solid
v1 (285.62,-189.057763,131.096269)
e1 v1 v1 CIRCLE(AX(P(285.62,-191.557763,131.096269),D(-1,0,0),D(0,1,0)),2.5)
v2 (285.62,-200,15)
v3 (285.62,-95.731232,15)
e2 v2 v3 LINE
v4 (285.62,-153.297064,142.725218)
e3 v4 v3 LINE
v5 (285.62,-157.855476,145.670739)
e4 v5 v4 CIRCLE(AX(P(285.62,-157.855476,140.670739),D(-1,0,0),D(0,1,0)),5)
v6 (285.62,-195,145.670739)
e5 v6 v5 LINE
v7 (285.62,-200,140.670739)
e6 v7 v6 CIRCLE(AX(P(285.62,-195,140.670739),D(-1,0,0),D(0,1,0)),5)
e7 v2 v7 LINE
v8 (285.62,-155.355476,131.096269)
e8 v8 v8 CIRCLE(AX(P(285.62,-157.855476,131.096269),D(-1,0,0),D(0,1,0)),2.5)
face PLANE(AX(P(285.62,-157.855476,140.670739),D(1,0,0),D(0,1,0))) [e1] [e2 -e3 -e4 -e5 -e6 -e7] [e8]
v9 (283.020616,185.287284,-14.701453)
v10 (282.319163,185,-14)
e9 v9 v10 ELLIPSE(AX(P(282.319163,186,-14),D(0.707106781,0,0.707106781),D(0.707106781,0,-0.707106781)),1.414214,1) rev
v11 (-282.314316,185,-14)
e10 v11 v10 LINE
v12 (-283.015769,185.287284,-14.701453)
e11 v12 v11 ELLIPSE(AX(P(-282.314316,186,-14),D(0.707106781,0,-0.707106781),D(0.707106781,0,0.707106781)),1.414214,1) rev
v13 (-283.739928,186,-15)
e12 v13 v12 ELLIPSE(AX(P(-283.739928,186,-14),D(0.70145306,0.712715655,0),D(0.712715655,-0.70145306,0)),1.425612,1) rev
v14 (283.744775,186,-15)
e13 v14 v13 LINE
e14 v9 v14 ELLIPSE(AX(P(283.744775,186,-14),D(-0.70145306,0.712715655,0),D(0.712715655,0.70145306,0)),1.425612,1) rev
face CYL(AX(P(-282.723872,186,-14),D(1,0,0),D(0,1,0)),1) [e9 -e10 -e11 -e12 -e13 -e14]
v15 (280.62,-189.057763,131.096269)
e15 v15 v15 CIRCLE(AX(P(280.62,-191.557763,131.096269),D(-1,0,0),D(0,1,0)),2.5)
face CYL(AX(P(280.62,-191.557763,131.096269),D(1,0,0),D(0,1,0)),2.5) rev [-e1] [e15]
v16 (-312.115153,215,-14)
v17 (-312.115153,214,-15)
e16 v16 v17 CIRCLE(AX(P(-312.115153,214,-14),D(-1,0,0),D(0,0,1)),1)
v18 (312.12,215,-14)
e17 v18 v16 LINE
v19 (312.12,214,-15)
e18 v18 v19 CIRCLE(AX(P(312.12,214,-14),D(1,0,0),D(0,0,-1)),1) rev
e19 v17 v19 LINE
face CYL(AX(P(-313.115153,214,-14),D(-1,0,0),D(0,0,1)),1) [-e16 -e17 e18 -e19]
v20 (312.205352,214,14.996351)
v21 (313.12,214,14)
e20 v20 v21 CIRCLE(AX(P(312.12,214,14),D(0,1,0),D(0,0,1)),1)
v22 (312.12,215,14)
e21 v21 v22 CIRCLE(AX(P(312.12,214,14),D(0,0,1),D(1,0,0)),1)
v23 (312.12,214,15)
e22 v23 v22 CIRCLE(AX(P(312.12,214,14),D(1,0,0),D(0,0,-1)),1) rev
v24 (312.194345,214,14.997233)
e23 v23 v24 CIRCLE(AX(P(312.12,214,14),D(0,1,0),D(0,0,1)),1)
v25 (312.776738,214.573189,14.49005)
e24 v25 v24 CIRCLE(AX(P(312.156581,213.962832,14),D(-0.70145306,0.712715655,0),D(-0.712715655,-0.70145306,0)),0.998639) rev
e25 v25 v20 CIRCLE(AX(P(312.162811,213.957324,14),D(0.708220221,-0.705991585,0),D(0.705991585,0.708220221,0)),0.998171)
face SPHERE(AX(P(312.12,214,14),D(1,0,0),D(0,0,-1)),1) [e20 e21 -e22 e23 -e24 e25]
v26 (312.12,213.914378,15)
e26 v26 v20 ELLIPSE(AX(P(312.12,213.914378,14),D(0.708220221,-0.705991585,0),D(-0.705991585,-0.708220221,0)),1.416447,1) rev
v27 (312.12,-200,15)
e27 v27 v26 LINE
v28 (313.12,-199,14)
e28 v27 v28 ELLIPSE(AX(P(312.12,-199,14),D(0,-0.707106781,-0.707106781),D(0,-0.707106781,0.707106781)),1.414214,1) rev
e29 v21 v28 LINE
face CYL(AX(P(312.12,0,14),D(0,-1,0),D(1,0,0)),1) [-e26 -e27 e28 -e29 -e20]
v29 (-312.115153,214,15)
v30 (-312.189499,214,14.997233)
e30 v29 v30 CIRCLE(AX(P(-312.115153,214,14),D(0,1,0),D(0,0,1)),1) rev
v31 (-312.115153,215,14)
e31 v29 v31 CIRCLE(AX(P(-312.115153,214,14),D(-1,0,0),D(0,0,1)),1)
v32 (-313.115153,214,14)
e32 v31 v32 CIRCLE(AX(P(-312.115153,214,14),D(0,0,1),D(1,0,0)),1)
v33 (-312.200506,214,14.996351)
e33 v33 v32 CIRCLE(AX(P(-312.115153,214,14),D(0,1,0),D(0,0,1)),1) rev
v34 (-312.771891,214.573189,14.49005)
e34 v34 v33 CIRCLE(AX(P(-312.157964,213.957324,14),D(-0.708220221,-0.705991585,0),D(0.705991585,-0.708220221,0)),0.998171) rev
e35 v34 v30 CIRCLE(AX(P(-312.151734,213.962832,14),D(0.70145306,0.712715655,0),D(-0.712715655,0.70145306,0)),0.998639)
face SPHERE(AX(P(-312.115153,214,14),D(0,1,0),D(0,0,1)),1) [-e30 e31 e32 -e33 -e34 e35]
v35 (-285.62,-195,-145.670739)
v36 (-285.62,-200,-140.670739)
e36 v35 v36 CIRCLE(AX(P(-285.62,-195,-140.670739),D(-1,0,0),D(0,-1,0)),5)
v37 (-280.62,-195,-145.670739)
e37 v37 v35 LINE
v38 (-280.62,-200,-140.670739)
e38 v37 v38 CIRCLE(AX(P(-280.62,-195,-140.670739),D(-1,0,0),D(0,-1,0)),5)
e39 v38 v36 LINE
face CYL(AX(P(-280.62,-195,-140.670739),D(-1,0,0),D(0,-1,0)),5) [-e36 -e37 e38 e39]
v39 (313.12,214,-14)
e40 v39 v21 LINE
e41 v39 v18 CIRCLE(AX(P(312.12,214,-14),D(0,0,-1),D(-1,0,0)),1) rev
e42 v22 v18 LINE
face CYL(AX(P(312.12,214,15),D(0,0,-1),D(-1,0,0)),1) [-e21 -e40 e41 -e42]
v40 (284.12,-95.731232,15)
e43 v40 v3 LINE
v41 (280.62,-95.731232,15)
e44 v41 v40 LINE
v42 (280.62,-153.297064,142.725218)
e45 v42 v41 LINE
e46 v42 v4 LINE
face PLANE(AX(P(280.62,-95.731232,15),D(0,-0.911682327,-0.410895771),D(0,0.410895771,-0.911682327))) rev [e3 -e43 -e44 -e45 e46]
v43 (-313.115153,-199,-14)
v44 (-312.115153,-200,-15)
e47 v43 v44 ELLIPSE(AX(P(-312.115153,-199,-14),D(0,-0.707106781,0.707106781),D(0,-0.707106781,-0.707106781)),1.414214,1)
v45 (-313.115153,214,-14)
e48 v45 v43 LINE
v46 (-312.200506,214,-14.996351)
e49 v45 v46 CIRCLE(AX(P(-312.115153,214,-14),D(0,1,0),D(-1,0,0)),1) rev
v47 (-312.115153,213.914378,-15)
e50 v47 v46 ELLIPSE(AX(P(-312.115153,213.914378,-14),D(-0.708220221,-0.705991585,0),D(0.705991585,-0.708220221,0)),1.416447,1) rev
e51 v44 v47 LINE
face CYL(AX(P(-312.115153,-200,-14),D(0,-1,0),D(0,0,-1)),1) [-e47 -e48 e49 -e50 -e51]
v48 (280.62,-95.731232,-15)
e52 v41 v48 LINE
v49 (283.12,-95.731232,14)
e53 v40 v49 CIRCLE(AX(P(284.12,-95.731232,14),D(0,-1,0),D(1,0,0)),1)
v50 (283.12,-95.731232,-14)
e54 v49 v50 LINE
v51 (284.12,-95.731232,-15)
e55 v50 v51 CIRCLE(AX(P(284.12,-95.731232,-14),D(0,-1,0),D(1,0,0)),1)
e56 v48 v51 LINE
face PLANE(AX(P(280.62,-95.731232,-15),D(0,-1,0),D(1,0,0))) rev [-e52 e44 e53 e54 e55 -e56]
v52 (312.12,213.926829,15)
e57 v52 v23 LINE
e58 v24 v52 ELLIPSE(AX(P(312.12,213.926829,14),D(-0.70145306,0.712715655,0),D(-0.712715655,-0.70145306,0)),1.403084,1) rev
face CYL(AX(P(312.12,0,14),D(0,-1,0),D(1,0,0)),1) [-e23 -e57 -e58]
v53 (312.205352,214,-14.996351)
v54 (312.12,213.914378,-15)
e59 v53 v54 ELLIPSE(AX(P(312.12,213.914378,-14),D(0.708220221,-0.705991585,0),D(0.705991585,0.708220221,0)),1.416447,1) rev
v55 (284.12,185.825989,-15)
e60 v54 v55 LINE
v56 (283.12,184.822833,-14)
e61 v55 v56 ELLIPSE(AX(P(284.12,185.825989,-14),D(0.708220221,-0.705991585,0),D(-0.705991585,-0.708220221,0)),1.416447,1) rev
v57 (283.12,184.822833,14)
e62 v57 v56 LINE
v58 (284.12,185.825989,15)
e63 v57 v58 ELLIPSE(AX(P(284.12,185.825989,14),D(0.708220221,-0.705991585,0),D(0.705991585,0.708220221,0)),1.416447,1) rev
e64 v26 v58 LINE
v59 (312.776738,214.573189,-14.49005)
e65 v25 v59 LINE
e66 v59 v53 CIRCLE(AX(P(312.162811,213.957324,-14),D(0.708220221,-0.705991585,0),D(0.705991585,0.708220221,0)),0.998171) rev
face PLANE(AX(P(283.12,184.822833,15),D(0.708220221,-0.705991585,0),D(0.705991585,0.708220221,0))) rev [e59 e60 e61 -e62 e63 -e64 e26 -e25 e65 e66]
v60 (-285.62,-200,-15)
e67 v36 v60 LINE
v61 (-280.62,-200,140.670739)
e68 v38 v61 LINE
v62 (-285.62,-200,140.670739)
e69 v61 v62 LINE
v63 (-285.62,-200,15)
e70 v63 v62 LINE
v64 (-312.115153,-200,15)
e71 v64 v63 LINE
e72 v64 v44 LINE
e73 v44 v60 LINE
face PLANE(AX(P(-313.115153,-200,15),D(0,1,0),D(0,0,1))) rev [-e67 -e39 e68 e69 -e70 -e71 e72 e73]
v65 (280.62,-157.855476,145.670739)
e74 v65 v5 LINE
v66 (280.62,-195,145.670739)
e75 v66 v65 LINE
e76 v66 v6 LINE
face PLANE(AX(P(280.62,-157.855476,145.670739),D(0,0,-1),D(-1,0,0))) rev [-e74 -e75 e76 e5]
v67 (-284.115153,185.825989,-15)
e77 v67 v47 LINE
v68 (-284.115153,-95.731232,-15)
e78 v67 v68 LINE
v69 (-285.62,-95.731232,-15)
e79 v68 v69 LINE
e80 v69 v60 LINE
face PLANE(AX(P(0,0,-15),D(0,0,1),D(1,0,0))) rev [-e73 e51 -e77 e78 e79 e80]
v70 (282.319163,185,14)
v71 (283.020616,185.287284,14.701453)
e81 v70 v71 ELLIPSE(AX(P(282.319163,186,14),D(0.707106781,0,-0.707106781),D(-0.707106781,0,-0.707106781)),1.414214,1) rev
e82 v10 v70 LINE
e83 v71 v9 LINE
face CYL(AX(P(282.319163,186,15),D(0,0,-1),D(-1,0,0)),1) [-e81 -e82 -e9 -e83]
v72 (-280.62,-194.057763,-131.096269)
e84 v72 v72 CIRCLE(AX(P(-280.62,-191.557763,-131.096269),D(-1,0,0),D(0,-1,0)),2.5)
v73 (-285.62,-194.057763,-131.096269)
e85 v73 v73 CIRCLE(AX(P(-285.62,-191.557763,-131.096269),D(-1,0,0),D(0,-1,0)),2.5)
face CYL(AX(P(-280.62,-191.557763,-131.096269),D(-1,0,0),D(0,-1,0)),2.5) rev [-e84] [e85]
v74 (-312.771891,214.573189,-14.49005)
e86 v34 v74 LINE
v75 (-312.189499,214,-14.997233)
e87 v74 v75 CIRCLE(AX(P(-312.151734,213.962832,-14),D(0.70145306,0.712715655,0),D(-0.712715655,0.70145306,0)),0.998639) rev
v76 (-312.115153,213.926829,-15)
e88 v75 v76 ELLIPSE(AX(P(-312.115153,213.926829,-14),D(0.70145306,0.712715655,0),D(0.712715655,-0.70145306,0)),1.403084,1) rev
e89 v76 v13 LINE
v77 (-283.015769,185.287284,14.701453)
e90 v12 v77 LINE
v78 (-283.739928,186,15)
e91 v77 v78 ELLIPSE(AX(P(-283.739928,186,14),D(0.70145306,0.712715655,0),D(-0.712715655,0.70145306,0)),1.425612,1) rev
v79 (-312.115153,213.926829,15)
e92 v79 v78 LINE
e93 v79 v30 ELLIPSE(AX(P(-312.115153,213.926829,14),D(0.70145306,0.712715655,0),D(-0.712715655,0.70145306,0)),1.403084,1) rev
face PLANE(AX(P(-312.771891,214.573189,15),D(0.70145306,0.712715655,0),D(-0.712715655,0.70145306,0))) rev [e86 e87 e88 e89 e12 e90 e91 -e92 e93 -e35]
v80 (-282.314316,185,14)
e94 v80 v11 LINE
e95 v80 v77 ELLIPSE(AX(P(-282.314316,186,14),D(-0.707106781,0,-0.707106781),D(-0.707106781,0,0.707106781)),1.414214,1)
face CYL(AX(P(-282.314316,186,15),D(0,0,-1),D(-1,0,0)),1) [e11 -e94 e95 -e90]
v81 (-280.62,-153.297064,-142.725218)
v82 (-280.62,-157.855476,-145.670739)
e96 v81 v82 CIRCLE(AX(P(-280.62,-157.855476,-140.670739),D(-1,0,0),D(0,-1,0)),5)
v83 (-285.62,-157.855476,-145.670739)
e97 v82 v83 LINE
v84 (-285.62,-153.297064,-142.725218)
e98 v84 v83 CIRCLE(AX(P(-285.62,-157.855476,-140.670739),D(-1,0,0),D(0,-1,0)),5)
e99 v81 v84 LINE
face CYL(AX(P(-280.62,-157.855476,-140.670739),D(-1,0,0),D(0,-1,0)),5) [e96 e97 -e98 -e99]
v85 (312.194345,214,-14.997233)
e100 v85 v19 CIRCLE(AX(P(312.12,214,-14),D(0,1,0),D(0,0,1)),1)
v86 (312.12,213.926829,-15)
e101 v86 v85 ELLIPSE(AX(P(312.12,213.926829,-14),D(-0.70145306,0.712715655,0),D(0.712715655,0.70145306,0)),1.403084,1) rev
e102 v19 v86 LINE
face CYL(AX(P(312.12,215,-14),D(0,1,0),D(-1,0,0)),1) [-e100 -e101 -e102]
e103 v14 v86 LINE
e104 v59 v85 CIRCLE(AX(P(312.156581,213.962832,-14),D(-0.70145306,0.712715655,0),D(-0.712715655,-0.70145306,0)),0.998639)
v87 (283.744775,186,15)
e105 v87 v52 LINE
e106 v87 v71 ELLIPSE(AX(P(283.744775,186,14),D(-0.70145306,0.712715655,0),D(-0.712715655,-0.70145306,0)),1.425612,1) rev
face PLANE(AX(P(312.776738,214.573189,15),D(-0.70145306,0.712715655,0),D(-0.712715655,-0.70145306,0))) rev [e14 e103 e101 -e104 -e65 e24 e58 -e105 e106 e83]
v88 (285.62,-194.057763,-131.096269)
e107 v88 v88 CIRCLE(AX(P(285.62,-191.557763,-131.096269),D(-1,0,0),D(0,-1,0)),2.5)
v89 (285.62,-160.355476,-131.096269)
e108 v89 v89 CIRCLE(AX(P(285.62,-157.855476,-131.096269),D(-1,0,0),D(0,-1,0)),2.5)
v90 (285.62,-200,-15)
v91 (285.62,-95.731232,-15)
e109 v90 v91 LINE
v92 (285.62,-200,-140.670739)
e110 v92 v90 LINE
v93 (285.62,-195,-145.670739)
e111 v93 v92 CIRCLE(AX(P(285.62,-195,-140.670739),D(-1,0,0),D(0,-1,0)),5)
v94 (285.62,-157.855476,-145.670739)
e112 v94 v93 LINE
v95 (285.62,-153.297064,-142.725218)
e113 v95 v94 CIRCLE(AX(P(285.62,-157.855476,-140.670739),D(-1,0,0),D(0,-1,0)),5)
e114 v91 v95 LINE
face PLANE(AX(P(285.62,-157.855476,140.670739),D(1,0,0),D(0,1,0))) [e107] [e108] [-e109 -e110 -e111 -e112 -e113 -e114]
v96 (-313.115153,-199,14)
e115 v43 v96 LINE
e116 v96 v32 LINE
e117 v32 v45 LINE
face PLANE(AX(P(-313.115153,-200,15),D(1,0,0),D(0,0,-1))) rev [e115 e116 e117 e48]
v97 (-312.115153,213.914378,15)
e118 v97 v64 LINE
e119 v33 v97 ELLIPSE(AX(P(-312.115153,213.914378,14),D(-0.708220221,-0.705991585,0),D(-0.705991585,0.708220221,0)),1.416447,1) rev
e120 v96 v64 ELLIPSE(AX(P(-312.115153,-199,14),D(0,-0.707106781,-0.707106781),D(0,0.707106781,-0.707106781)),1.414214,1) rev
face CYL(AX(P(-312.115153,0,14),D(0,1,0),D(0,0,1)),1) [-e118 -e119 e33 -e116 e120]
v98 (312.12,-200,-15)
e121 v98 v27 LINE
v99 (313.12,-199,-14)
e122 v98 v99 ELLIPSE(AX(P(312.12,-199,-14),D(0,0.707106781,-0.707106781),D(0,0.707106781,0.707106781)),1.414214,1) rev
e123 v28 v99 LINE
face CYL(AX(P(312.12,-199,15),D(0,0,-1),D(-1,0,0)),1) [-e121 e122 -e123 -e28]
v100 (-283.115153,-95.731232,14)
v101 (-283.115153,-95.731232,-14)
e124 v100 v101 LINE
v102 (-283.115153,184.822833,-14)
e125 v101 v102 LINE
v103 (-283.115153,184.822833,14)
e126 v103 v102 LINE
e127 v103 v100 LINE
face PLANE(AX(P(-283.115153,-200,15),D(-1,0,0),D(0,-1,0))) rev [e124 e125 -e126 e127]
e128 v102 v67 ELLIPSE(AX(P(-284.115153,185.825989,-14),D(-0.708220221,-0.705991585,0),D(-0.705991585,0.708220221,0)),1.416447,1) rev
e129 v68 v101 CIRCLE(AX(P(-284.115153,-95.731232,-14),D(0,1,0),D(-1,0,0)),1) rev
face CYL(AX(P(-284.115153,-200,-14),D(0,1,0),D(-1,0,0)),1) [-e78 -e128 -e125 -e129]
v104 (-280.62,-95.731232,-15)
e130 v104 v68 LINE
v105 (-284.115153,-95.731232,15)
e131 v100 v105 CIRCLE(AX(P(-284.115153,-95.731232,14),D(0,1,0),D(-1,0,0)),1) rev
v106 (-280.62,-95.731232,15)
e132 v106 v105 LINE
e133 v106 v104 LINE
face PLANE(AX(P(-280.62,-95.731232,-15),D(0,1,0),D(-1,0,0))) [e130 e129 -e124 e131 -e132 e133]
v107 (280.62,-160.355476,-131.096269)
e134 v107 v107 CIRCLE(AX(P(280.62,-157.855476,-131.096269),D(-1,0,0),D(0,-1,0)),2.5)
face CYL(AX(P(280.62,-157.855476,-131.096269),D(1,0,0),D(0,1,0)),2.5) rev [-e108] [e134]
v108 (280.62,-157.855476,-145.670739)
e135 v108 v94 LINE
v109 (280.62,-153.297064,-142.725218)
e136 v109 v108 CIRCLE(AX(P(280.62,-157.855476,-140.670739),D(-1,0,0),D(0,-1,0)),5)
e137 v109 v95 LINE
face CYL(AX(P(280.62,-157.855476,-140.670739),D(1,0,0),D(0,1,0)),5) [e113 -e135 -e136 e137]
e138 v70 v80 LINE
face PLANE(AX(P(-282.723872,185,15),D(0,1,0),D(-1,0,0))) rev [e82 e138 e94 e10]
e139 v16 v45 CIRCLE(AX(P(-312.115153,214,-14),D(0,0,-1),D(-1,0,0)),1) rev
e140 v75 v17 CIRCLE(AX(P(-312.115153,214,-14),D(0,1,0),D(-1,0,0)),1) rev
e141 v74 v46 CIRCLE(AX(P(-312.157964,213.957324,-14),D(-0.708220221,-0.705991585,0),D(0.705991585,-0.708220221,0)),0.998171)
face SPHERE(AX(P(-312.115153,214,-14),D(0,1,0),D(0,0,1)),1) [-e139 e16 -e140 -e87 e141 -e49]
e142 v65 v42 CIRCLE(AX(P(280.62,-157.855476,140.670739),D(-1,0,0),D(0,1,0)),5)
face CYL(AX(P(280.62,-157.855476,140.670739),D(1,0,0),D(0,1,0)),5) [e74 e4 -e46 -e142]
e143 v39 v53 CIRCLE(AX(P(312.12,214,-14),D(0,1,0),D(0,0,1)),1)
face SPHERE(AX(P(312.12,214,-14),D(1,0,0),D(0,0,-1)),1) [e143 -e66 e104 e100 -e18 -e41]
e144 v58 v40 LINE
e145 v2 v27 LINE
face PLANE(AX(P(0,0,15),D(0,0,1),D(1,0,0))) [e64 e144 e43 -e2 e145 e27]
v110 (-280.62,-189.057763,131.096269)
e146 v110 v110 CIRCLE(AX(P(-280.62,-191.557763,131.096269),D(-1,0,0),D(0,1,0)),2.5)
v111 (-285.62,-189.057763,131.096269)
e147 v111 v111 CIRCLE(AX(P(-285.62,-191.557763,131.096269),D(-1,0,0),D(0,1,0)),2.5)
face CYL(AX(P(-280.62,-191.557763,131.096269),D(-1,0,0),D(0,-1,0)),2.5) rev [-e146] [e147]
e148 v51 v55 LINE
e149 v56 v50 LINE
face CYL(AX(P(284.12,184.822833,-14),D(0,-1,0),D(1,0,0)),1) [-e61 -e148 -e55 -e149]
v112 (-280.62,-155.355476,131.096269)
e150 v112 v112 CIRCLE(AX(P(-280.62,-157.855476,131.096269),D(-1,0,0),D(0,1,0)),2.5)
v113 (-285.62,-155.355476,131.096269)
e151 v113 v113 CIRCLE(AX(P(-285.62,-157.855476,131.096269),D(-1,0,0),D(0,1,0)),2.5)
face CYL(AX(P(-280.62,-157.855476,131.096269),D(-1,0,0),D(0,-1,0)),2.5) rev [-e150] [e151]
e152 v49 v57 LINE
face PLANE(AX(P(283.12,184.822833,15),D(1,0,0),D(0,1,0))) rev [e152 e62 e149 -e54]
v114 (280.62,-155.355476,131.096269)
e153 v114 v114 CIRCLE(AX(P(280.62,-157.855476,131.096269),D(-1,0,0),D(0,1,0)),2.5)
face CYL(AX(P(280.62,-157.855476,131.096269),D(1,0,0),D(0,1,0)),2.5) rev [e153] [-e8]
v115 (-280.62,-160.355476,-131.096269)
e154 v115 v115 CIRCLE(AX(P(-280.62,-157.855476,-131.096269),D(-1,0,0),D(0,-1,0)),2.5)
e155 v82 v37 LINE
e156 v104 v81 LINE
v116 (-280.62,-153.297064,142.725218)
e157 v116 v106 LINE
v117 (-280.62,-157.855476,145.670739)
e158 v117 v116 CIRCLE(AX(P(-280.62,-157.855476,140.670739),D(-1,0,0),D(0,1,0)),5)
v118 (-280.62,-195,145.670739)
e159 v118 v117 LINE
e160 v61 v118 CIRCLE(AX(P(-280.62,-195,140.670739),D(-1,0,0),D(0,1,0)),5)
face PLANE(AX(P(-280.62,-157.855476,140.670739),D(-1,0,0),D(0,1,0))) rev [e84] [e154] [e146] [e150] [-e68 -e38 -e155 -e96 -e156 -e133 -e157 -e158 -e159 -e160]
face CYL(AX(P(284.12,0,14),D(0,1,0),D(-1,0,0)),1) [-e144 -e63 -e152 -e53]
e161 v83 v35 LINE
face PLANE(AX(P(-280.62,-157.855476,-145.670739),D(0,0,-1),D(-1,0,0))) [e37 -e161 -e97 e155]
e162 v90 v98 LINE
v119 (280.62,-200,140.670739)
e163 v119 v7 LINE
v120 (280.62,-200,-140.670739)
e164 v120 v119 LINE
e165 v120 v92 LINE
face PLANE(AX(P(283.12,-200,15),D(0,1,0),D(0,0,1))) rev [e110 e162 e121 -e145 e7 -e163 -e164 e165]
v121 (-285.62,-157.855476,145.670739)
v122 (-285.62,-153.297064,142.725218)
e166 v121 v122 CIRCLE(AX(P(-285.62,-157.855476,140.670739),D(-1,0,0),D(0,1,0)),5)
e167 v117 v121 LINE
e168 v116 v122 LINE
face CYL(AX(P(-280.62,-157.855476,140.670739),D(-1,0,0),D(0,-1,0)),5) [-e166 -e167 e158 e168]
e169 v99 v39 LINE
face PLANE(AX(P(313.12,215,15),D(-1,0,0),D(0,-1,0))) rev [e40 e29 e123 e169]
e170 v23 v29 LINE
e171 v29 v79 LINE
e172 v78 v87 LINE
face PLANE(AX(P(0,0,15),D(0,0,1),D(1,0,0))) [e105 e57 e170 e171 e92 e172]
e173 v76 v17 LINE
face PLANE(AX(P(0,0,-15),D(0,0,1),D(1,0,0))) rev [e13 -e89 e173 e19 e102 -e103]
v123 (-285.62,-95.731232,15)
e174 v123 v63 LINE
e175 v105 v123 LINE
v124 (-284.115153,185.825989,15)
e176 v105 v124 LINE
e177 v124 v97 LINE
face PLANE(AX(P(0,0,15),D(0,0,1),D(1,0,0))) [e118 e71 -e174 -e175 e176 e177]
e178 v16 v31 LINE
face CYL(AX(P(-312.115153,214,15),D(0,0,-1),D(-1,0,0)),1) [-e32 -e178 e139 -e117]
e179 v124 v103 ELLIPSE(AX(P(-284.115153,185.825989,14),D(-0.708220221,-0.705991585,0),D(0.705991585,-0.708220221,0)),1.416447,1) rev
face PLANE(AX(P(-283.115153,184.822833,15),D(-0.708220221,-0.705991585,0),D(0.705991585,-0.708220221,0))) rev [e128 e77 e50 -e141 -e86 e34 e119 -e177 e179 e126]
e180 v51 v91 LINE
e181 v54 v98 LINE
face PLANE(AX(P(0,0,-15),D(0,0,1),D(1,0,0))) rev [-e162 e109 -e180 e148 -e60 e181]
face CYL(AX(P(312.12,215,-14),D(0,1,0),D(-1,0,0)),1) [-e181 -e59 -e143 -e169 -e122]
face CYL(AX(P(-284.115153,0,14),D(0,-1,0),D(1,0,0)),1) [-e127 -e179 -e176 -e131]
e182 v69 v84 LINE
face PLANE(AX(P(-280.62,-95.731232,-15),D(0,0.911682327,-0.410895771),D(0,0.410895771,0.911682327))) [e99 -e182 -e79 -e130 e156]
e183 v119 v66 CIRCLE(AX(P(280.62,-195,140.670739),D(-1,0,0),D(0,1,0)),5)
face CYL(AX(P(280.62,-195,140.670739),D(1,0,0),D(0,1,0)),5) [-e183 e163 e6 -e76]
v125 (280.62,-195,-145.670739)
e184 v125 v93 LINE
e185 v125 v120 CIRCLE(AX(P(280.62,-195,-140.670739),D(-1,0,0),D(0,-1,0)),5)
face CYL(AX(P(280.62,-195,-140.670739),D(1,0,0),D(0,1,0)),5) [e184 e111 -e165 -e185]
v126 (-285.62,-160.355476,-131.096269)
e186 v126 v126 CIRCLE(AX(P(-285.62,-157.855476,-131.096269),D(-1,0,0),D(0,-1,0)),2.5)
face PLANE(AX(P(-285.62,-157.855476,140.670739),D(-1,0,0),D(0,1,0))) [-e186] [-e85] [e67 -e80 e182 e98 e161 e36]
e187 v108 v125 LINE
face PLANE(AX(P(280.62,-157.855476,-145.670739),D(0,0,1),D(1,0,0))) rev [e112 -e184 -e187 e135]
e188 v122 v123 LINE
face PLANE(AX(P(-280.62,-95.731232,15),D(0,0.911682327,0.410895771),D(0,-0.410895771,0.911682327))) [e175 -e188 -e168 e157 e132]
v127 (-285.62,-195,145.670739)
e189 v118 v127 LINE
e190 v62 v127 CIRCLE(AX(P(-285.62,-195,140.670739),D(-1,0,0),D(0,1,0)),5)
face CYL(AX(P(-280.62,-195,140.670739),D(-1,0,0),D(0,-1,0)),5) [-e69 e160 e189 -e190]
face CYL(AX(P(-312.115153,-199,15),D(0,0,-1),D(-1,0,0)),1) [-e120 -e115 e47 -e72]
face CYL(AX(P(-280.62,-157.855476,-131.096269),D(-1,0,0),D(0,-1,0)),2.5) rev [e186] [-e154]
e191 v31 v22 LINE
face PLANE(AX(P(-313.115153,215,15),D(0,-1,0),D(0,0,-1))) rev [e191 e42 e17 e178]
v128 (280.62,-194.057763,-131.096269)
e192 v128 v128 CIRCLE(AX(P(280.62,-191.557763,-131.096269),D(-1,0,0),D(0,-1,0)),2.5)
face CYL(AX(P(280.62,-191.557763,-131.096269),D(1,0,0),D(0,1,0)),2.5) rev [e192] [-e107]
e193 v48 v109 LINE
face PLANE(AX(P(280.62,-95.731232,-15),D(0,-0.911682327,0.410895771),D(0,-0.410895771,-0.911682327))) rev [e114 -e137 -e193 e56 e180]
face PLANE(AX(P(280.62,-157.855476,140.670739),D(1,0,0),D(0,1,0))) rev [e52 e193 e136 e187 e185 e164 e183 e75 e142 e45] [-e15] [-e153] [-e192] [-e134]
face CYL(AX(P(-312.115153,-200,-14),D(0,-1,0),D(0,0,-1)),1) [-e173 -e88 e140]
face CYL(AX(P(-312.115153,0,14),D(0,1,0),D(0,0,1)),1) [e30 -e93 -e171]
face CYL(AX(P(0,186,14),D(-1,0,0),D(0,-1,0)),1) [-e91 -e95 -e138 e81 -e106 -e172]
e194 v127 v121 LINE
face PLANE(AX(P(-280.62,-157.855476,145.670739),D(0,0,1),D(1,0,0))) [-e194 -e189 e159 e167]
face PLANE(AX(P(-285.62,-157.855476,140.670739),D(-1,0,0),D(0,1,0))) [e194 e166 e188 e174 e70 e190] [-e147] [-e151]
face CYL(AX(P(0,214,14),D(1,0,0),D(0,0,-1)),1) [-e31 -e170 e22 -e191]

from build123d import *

# Parameters (mm, degrees)
BOSS_EXTRUDE1_DEPTH = 15
SKETCH2_R           = 2.5
BOSS_EXTRUDE2_DEPTH = 2.5
FILLET1_R           = 1


with BuildPart() as part:
    # Sketch1 → Boss-Extrude1 (new, symmetric)
    with BuildSketch(Plane.XY):
        Polygon((-283.115153194, -200), (-283.115153194, 184.822832525), (-312.771891152, 214.573189293), (-282.723872007, 185), (282.728718813, 185), (312.776737958, 214.573189293), (283.12, 184.822832525), (283.12, -200), (313.12, -200), (313.12, 215), (-313.115153194, 215), (-313.115153194, -200), align=None)
    extrude(amount=BOSS_EXTRUDE1_DEPTH, both=True)

    # Sketch2 → Boss-Extrude2 (add, symmetric)
    with BuildSketch(Plane.ZY.offset(-283.12)):
        with BuildLine():
            Line((-15, -95.731232334), (-142.725217813, -153.297064452))
            ThreePointArc((-142.725217813, -153.297064452), (-144.870286213, -155.141843308), (-145.67073896, -157.855476088))
            Line((-145.67073896, -157.855476088), (-145.67073896, -195))
            ThreePointArc((-145.67073896, -195), (-144.206272866, -198.535533906), (-140.67073896, -200))
            Line((-140.67073896, -200), (140.67073896, -200))
            ThreePointArc((140.67073896, -200), (144.206272866, -198.535533906), (145.67073896, -195))
            Line((145.67073896, -195), (145.67073896, -157.855476088))
            ThreePointArc((145.67073896, -157.855476088), (144.870286213, -155.141843308), (142.725217813, -153.297064452))
            Line((142.725217813, -153.297064452), (15, -95.731232334))
            Line((15, -95.731232334), (-15, -95.731232334))
        make_face()
        with Locations(Location((-131.096268678, -157.855476088, 0), (0, 0, 270))):
            Circle(SKETCH2_R, mode=Mode.SUBTRACT)
        with Locations(Location((-131.096268678, -191.557763375, 0), (0, 0, 270))):
            Circle(SKETCH2_R, mode=Mode.SUBTRACT)
        with Locations(Location((131.096268678, -191.557763375, 0), (0, 0, 90))):
            Circle(SKETCH2_R, mode=Mode.SUBTRACT)
        with Locations(Location((131.096268678, -157.855476088, 0), (0, 0, 90))):
            Circle(SKETCH2_R, mode=Mode.SUBTRACT)
    boss_extrude2 = extrude(amount=BOSS_EXTRUDE2_DEPTH, both=True)

    # Mirror2: Boss-Extrude2 across plane
    add(boss_extrude2.mirror(Plane(origin=(0, 0, 0), x_dir=(0, 0, 1), z_dir=(1, 0, 0))))

    # Fillet1
    # the kernel refuses this fillet: 1 mm, written as the material it takes off along each edge
    with BuildSketch(Plane(origin=(-312.115153194, 214, -14), x_dir=(0, 0, -1), z_dir=(-1, 0, 0))) as fillet1_piece_1_section:
        Polygon((0, 0), (FILLET1_R * 1.02, 0), (FILLET1_R * 1.02, -FILLET1_R * 1.02), (0, -FILLET1_R * 1.02), align=None)
    fillet1_piece_1 = extrude(amount=FILLET1_R * 1.02, mode=Mode.PRIVATE)
    fillet1_piece_1 = fillet1_piece_1 - Plane(origin=(-312.115153194, 214, -14), x_dir=(0, -0.7071067811865475, 0.7071067811865475), z_dir=(-1, 0, 0)) * Sphere(FILLET1_R, mode=Mode.PRIVATE)
    add(fillet1_piece_1, mode=Mode.SUBTRACT)
    with BuildSketch(Plane(origin=(312.12, 214, -14), x_dir=(1, 0, 0), z_dir=(0, 1, 0))) as fillet1_piece_2_section:
        Polygon((0, 0), (FILLET1_R * 1.02, 0), (FILLET1_R * 1.02, FILLET1_R * 1.02), (0, FILLET1_R * 1.02), align=None)
    fillet1_piece_2 = extrude(amount=FILLET1_R * 1.02, mode=Mode.PRIVATE)
    fillet1_piece_2 = fillet1_piece_2 - Plane(origin=(312.12, 214, -14), x_dir=(-0.7071067811865475, 0, 0.7071067811865475), z_dir=(0, 1, 0)) * Sphere(FILLET1_R, mode=Mode.PRIVATE)
    add(fillet1_piece_2, mode=Mode.SUBTRACT)
    with BuildSketch(Plane(origin=(-312.115153194, 214, 14), x_dir=(0, 0, 1), z_dir=(-1, 0, 0))) as fillet1_piece_3_section:
        Polygon((0, 0), (FILLET1_R * 1.02, 0), (FILLET1_R * 1.02, FILLET1_R * 1.02), (0, FILLET1_R * 1.02), align=None)
    fillet1_piece_3 = extrude(amount=FILLET1_R * 1.02, mode=Mode.PRIVATE)
    fillet1_piece_3 = fillet1_piece_3 - Plane(origin=(-312.115153194, 214, 14), x_dir=(0, -0.7071067811865475, -0.7071067811865475), z_dir=(-1, 0, 0)) * Sphere(FILLET1_R, mode=Mode.PRIVATE)
    add(fillet1_piece_3, mode=Mode.SUBTRACT)
    with BuildSketch(Plane(origin=(312.12, 214, 14), x_dir=(1, 0, 0), z_dir=(0, 1, 0))) as fillet1_piece_4_section:
        Polygon((0, 0), (FILLET1_R * 1.02, 0), (FILLET1_R * 1.02, -FILLET1_R * 1.02), (0, -FILLET1_R * 1.02), align=None)
    fillet1_piece_4 = extrude(amount=FILLET1_R * 1.02, mode=Mode.PRIVATE)
    fillet1_piece_4 = fillet1_piece_4 - Plane(origin=(312.12, 214, 14), x_dir=(-0.7071067811865475, 0, -0.7071067811865475), z_dir=(0, 1, 0)) * Sphere(FILLET1_R, mode=Mode.PRIVATE)
    add(fillet1_piece_4, mode=Mode.SUBTRACT)
    with BuildSketch(Plane(origin=(-313.115153194, 214, -15), x_dir=(0, 0, 1), z_dir=(0, -1, 0)), Plane(origin=(313.12, -202.5, 15), x_dir=(-1, 0, 0), z_dir=(0, 1, 0))) as fillet1_piece_5:
        with BuildLine():
            CenterArc((FILLET1_R, -FILLET1_R), FILLET1_R, 90, 90)
            Line((0, -FILLET1_R), (0, 0))
            Line((0, 0), (FILLET1_R, 0))
        make_face()
    extrude(amount=416.5, mode=Mode.SUBTRACT)
    with BuildSketch(Plane(origin=(312.12, 215, -15), x_dir=(0, -1, 0), z_dir=(-1, 0, 0))) as fillet1_piece_6:
        with BuildLine():
            CenterArc((FILLET1_R, FILLET1_R), FILLET1_R, 180, 90)
            Line((0, FILLET1_R), (0, 0))
            Line((0, 0), (FILLET1_R, 0))
        make_face()
    extrude(amount=624.235153194, mode=Mode.SUBTRACT)
    with BuildSketch(Plane(origin=(313.12, -202.5, -15), x_dir=(-1, 0, 0), z_dir=(0, 1, 0)), Plane(origin=(-313.115153194, 214, 15), x_dir=(0, 0, -1), z_dir=(0, -1, 0))) as fillet1_piece_7:
        with BuildLine():
            CenterArc((FILLET1_R, FILLET1_R), FILLET1_R, 180, 90)
            Line((0, FILLET1_R), (0, 0))
            Line((0, 0), (FILLET1_R, 0))
        make_face()
    extrude(amount=416.5, mode=Mode.SUBTRACT)
    with BuildSketch(Plane(origin=(283.12, 187.322832525, -15), x_dir=(1, 0, 0), z_dir=(0, -1, 0))) as fillet1_piece_8_section:
        with BuildLine():
            CenterArc((FILLET1_R, FILLET1_R), FILLET1_R, 180, 90)
            Line((0, FILLET1_R), (0, 0))
            Line((0, 0), (FILLET1_R, 0))
        make_face()
    fillet1_piece_8 = extrude(amount=283.054064858, mode=Mode.PRIVATE)
    fillet1_piece_8 = split(fillet1_piece_8, bisect_by=Plane(origin=(212.904028108, 116.278704743, -14.776762441), z_dir=(0.7014530599300108, -0.712715654882664, 0)), keep=Keep.TOP, mode=Mode.PRIVATE)
    add(fillet1_piece_8, mode=Mode.SUBTRACT)
    with BuildSketch(Plane(origin=(-285.223872007, 185, -15), x_dir=(0, 1, 0), z_dir=(1, 0, 0))) as fillet1_piece_9_section:
        with BuildLine():
            CenterArc((FILLET1_R, FILLET1_R), FILLET1_R, 180, 90)
            Line((0, FILLET1_R), (0, 0))
            Line((0, 0), (FILLET1_R, 0))
        make_face()
    fillet1_piece_9 = extrude(amount=570.45259082, mode=Mode.PRIVATE)
    fillet1_piece_9 = split(fillet1_piece_9, bisect_by=Plane(origin=(139.225783569, 43.764750927, -14.776706333), z_dir=(-0.7014530599300108, 0.712715654882664, 0)), keep=Keep.TOP, mode=Mode.PRIVATE)
    fillet1_piece_9 = split(fillet1_piece_9, bisect_by=Plane(origin=(-142.20285466, 43.465709552, -14.776706333), z_dir=(0.7082202214843082, 0.7059915848512059, 0)), keep=Keep.TOP, mode=Mode.PRIVATE)
    add(fillet1_piece_9, mode=Mode.SUBTRACT)
    with BuildSketch(Plane(origin=(-313.115153194, -200, 17.5), x_dir=(1, 0, 0), z_dir=(0, 0, -1))) as fillet1_piece_10:
        with BuildLine():
            CenterArc((FILLET1_R, -FILLET1_R), FILLET1_R, 90, 90)
            Line((0, -FILLET1_R), (0, 0))
            Line((0, 0), (FILLET1_R, 0))
        make_face()
    extrude(amount=35, mode=Mode.SUBTRACT)
    with BuildSketch(Plane(origin=(-313.115153194, 215, 14), x_dir=(0, -1, 0), z_dir=(0, 0, -1))) as fillet1_piece_11:
        with BuildLine():
            CenterArc((FILLET1_R, -FILLET1_R), FILLET1_R, 90, 90)
            Line((0, -FILLET1_R), (0, 0))
            Line((0, 0), (FILLET1_R, 0))
        make_face()
    extrude(amount=28, mode=Mode.SUBTRACT)
    with BuildSketch(Plane(origin=(313.12, 215, -14), x_dir=(-1, 0, 0), z_dir=(0, 0, 1))) as fillet1_piece_12:
        with BuildLine():
            CenterArc((FILLET1_R, FILLET1_R), FILLET1_R, 180, 90)
            Line((0, FILLET1_R), (0, 0))
            Line((0, 0), (FILLET1_R, 0))
        make_face()
    extrude(amount=28, mode=Mode.SUBTRACT)
    with BuildSketch(Plane(origin=(-285.223872007, 185, 15), x_dir=(0, 1, 0), z_dir=(1, 0, 0))) as fillet1_piece_13_section:
        with BuildLine():
            CenterArc((FILLET1_R, -FILLET1_R), FILLET1_R, 90, 90)
            Line((0, -FILLET1_R), (0, 0))
            Line((0, 0), (FILLET1_R, 0))
        make_face()
    fillet1_piece_13 = extrude(amount=570.45259082, mode=Mode.PRIVATE)
    fillet1_piece_13 = split(fillet1_piece_13, bisect_by=Plane(origin=(139.225783569, 43.764750927, 14.776706333), z_dir=(-0.7014530599300108, 0.712715654882664, 0)), keep=Keep.TOP, mode=Mode.PRIVATE)
    fillet1_piece_13 = split(fillet1_piece_13, bisect_by=Plane(origin=(-142.20285466, 43.465709552, 14.776706333), z_dir=(0.7082202214843082, 0.7059915848512059, 0)), keep=Keep.TOP, mode=Mode.PRIVATE)
    add(fillet1_piece_13, mode=Mode.SUBTRACT)
    with BuildSketch(Plane(origin=(313.12, -200, -17.5), x_dir=(0, 1, 0), z_dir=(0, 0, 1))) as fillet1_piece_14:
        with BuildLine():
            CenterArc((FILLET1_R, FILLET1_R), FILLET1_R, 180, 90)
            Line((0, FILLET1_R), (0, 0))
            Line((0, 0), (FILLET1_R, 0))
        make_face()
    extrude(amount=35, mode=Mode.SUBTRACT)
    with BuildSketch(Plane(origin=(282.728718813, 185, -16.023890127), x_dir=(0.7127156548826233, 0.701453059930052, 0), z_dir=(0, 0, 1)), Plane(origin=(-282.723872007, 185, -16.023890127), x_dir=(1, 0, 0), z_dir=(0, 0, 1))) as fillet1_piece_15:
        with BuildLine():
            CenterArc((FILLET1_R * 0.409556050901, FILLET1_R), FILLET1_R, 225.456300233, 44.543699767)
            Line((-FILLET1_R * 0.291897009029, FILLET1_R * 0.287284345117), (0, 0))
            Line((0, 0), (FILLET1_R * 0.409556050901, 0))
        make_face()
    extrude(amount=32.047780255, mode=Mode.SUBTRACT)
    with BuildSketch(Plane(origin=(283.12, 187.322832525, 15), x_dir=(1, 0, 0), z_dir=(0, -1, 0))) as fillet1_piece_16_section:
        with BuildLine():
            CenterArc((FILLET1_R, -FILLET1_R), FILLET1_R, 90, 90)
            Line((0, -FILLET1_R), (0, 0))
            Line((0, 0), (FILLET1_R, 0))
        make_face()
    fillet1_piece_16 = extrude(amount=283.054064858, mode=Mode.PRIVATE)
    fillet1_piece_16 = split(fillet1_piece_16, bisect_by=Plane(origin=(212.904028108, 116.278704743, 14.776762441), z_dir=(0.7014530599300108, -0.712715654882664, 0)), keep=Keep.TOP, mode=Mode.PRIVATE)
    add(fillet1_piece_16, mode=Mode.SUBTRACT)
    with BuildSketch(Plane(origin=(312.12, 215, 15), x_dir=(0, -1, 0), z_dir=(-1, 0, 0))) as fillet1_piece_17:
        with BuildLine():
            CenterArc((FILLET1_R, -FILLET1_R), FILLET1_R, 90, 90)
            Line((0, -FILLET1_R), (0, 0))
            Line((0, 0), (FILLET1_R, 0))
        make_face()
    extrude(amount=624.235153194, mode=Mode.SUBTRACT)
    with BuildSketch(Plane(origin=(-283.115153194, -95.731232334, -15), x_dir=(-1, 0, 0), z_dir=(0, 1, 0))) as fillet1_piece_18_section:
        with BuildLine():
            CenterArc((FILLET1_R, FILLET1_R), FILLET1_R, 180, 90)
            Line((0, FILLET1_R), (0, 0))
            Line((0, 0), (FILLET1_R, 0))
        make_face()
    fillet1_piece_18 = extrude(amount=283.054064858, mode=Mode.PRIVATE)
    fillet1_piece_18 = split(fillet1_piece_18, bisect_by=Plane(origin=(-142.946899789, 44.212103442, -14.61922956), z_dir=(-0.7082202214843082, -0.7059915848512059, 0)), keep=Keep.TOP, mode=Mode.PRIVATE)
    add(fillet1_piece_18, mode=Mode.SUBTRACT)
    with BuildSketch(Plane(origin=(-283.115153194, -95.731232334, 15), x_dir=(-1, 0, 0), z_dir=(0, 1, 0))) as fillet1_piece_19_section:
        with BuildLine():
            CenterArc((FILLET1_R, -FILLET1_R), FILLET1_R, 90, 90)
            Line((0, -FILLET1_R), (0, 0))
            Line((0, 0), (FILLET1_R, 0))
        make_face()
    fillet1_piece_19 = extrude(amount=283.054064858, mode=Mode.PRIVATE)
    fillet1_piece_19 = split(fillet1_piece_19, bisect_by=Plane(origin=(-142.946899789, 44.212103442, 14.61922956), z_dir=(-0.7082202214843082, -0.7059915848512059, 0)), keep=Keep.TOP, mode=Mode.PRIVATE)
    add(fillet1_piece_19, mode=Mode.SUBTRACT)


solid = part.part
